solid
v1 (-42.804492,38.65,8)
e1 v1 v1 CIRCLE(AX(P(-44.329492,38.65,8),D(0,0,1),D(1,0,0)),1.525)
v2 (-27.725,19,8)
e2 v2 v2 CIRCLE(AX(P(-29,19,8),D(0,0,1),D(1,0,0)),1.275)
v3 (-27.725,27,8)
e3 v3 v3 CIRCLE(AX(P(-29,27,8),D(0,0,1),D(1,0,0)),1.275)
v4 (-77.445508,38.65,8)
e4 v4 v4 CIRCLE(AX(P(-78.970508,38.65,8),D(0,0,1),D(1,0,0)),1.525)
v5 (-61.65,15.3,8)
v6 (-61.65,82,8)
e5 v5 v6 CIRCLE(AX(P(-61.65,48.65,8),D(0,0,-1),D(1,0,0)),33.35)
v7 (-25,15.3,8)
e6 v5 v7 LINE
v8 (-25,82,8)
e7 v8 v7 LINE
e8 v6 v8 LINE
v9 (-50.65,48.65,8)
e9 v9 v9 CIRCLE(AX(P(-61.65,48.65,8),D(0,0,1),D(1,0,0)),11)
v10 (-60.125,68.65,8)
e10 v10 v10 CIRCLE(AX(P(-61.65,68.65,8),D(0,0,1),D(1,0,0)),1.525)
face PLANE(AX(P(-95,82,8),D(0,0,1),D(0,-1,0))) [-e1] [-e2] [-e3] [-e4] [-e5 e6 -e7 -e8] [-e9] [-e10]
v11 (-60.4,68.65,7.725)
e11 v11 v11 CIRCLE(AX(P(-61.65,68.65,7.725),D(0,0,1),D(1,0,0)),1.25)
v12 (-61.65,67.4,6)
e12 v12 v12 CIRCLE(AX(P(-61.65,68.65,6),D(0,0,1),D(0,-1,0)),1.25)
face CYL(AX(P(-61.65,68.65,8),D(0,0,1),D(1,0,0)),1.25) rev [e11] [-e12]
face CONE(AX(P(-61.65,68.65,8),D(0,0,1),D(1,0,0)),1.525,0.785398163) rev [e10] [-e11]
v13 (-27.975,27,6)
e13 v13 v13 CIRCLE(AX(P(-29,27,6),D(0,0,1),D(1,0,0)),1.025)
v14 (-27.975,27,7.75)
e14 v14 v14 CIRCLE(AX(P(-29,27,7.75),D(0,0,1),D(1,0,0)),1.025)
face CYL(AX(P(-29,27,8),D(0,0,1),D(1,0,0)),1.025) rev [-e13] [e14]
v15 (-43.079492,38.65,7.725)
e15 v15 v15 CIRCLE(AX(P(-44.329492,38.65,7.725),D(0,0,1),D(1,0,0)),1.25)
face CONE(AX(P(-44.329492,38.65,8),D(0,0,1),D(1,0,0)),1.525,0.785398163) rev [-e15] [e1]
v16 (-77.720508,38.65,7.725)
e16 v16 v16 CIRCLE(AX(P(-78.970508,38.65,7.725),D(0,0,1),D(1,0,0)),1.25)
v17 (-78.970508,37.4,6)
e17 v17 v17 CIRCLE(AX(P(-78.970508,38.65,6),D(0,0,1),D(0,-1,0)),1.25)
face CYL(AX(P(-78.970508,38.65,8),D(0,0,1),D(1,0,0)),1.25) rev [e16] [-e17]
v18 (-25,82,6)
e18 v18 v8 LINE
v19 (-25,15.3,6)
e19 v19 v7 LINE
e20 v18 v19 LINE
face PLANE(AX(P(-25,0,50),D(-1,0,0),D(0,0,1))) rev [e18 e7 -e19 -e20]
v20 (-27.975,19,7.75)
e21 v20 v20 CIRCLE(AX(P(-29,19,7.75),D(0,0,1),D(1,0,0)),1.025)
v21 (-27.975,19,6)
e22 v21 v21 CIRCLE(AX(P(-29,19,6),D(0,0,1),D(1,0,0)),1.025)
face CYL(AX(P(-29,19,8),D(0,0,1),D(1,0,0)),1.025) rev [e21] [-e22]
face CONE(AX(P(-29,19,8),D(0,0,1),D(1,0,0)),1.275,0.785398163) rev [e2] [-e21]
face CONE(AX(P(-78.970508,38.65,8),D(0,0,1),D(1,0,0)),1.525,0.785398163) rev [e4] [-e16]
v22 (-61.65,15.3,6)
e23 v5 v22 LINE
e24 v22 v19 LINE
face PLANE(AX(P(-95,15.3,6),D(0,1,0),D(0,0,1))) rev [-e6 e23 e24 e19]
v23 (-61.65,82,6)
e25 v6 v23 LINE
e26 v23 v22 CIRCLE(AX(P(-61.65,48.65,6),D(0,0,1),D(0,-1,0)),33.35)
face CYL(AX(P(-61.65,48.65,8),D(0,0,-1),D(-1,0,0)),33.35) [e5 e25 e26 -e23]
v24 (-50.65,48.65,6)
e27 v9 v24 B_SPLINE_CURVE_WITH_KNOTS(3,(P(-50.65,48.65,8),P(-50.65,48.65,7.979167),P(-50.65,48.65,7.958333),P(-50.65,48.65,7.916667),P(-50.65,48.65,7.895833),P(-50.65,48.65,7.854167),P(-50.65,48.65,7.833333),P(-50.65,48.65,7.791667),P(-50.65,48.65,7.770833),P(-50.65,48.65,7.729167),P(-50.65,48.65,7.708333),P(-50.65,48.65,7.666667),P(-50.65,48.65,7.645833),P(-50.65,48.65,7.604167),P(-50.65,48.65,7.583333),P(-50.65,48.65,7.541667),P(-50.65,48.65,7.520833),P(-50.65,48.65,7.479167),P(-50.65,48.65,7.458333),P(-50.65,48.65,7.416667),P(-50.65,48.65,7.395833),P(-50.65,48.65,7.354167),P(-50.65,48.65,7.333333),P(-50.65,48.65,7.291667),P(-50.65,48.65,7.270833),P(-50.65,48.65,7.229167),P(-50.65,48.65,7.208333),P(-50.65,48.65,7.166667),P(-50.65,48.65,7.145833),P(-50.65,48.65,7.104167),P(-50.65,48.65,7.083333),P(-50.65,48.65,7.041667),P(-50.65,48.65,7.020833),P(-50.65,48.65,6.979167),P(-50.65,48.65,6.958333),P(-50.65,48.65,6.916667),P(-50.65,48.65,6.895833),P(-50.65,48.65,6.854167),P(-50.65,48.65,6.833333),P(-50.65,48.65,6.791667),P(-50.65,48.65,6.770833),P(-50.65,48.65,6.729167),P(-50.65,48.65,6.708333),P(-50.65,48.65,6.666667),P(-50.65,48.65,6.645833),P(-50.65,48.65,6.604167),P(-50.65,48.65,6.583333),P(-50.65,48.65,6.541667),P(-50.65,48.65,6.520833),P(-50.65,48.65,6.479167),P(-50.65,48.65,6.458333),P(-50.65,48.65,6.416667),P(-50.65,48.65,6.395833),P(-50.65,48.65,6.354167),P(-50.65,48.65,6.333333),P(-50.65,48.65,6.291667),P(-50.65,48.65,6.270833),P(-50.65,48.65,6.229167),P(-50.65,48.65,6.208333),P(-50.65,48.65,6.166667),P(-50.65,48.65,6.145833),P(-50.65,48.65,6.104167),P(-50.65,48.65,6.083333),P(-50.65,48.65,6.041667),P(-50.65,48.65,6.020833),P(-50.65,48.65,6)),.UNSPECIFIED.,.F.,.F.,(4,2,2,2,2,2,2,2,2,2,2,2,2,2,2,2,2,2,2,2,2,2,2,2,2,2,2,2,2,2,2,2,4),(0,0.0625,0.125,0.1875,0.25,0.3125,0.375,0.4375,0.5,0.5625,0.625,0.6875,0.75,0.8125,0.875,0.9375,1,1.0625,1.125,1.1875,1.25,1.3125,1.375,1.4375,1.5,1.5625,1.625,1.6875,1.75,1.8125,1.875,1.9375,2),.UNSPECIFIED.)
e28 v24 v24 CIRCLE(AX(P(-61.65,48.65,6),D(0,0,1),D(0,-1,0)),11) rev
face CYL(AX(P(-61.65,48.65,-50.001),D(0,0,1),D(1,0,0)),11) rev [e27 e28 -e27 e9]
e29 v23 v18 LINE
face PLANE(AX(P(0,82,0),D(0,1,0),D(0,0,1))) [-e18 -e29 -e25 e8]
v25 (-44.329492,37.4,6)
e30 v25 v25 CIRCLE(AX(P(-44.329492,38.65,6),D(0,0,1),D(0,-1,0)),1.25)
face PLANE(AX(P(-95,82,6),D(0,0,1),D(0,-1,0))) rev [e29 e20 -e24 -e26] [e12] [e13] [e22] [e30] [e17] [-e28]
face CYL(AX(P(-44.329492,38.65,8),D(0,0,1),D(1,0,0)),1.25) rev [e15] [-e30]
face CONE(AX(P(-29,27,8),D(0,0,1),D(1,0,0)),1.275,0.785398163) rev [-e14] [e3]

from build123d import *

# Parameters (mm, degrees)
SKETCH_1_W                   = 50
SKETCH_1_H                   = 100
EXTRUDE_1_DEPTH              = 2
SKETCH_2_W                   = 3
SKETCH_2_H                   = 100
EXTRUDE_2_DEPTH              = 80
SKETCH_3_W                   = 2
SKETCH_3_H                   = 66.7
EXTRUDE_3_DEPTH              = 70
CUT_EXTRUDE_4_REACH          = 162.465
SKETCH_8_W                   = 2
SKETCH_8_H                   = 66.7
EXTRUDE_4_DEPTH              = 70
CUT_EXTRUDE_5_REACH          = 140.25
HOLE_WIZARD_M3_1_D           = 2.5
HOLE_WIZARD_M3_1_DEPTH       = 2
HOLE_WIZARD_M3_1_CSINK_D     = 3.05
HOLE_WIZARD_M3_1_CSINK_ANGLE = 90
FILLET_1_R                   = 2
CUT_EXTRUDE_6_REACH          = 140.25
SKETCH_12_R                  = 11
CUT_EXTRUDE_7_REACH          = 162.465
SKETCH_13_R                  = 14.5
SKETCH_14_W                  = 2
SKETCH_14_H                  = 66.7
EXTRUDE_5_DEPTH              = 70
CUT_EXTRUDE_8_REACH          = 156.14
SKETCH_15_R                  = 5.1
CUT_EXTRUDE_9_DEPTH          = 155.140358116
CUT_EXTRUDE_9_DEPTH_BACK     = 155.140358116
SKETCH_19_W                  = 2
SKETCH_19_H                  = 66.7
CUT_EXTRUDE_10_DEPTH         = 119.844436134
FILLET_2_R                   = 2
HOLE_WIZARD_M3_3_D           = 2.5
HOLE_WIZARD_M3_3_CSINK_D     = 3.05
HOLE_WIZARD_M3_3_CSINK_ANGLE = 90
CUT_EXTRUDE_11_DEPTH         = 134.88427839
CUT_EXTRUDE_11_DEPTH_BACK    = 134.88427839


# Read off the part's stored shape, not the designer's step: M1.6 螺纹孔1, M1.6 螺纹孔2, M2.5 螺纹孔1
with BuildPart() as part:
    # 草图1 → 凸台-拉伸1 (new body)
    with BuildSketch(Plane(origin=(0, 0, 0), x_dir=(1, 0, 0), z_dir=(0, 1, 0))):
        Rectangle(SKETCH_1_W, SKETCH_1_H)
    extrude(amount=EXTRUDE_1_DEPTH)

    # 草图2 → 凸台-拉伸2 (add)
    with BuildSketch(Plane(origin=(0, 2, 0), x_dir=(1, 0, 0), z_dir=(0, 1, 0))):
        with Locations((-23.5, 0)):
            Rectangle(SKETCH_2_W, SKETCH_2_H)
    extrude(amount=EXTRUDE_2_DEPTH)

    # 草图3 → 凸台-拉伸3 (add)
    with BuildSketch(Plane.ZY.offset(25)):
        with Locations((-49, 48.65)):
            Rectangle(SKETCH_3_W, SKETCH_3_H)
    extrude(amount=EXTRUDE_3_DEPTH)

    # 草图4 → 切除-拉伸4 (cut, up to next)
    with BuildSketch(Plane(origin=(0, 0, -50), x_dir=(-1, 0, 0), z_dir=(0, 0, -1)), mode=Mode.PRIVATE) as cut_extrude_4_sk1:
        with BuildLine():
            Line((95, 82), (61.65, 82))
            ThreePointArc((61.65, 82), (85.232011153, 72.232011153), (95, 48.65))
            Line((95, 48.65), (95, 82))
        make_face()
    cut_extrude_4_tool1 = extrude(cut_extrude_4_sk1.sketch, amount=-CUT_EXTRUDE_4_REACH, mode=Mode.PRIVATE) & part.part
    # 草图4 → 切除-拉伸4 (cut, up to next)
    with BuildSketch(Plane(origin=(0, 0, -50), x_dir=(-1, 0, 0), z_dir=(0, 0, -1)), mode=Mode.PRIVATE) as cut_extrude_4_sk2:
        with BuildLine():
            ThreePointArc((95, 48.65), (85.232011153, 25.067988847), (61.65, 15.3))
            Line((61.65, 15.3), (95, 15.3))
            Line((95, 15.3), (95, 48.65))
        make_face()
    cut_extrude_4_tool2 = extrude(cut_extrude_4_sk2.sketch, amount=-CUT_EXTRUDE_4_REACH, mode=Mode.PRIVATE) & part.part
    add(cut_extrude_4_tool1.solids().sort_by_distance((-87.550679, 74.550679, -50))[0], mode=Mode.SUBTRACT)
    add(cut_extrude_4_tool2.solids().sort_by_distance((-87.550679, 22.749321, -50))[0], mode=Mode.SUBTRACT)

    # 草图8 → 凸台-拉伸4 (add)
    with BuildSketch(Plane.ZY.offset(25)):
        with Locations((7, 48.65)):
            Rectangle(SKETCH_8_W, SKETCH_8_H)
    extrude(amount=EXTRUDE_4_DEPTH)

    # 草图9 → 切除-拉伸5 (cut, up to next)
    with BuildSketch(Plane.XY.offset(8), mode=Mode.PRIVATE) as cut_extrude_5_sk1:
        with BuildLine():
            ThreePointArc((-95, 48.65), (-85.232011153, 72.232011153), (-61.65, 82))
            Line((-61.65, 82), (-95, 82))
            Line((-95, 82), (-95, 48.65))
        make_face()
    cut_extrude_5_tool1 = extrude(cut_extrude_5_sk1.sketch, amount=-CUT_EXTRUDE_5_REACH, mode=Mode.PRIVATE) & part.part
    # 草图9 → 切除-拉伸5 (cut, up to next)
    with BuildSketch(Plane.XY.offset(8), mode=Mode.PRIVATE) as cut_extrude_5_sk2:
        with BuildLine():
            ThreePointArc((-61.65, 15.3), (-85.232011153, 25.067988847), (-95, 48.65))
            Line((-95, 48.65), (-95, 15.3))
            Line((-95, 15.3), (-61.65, 15.3))
        make_face()
    cut_extrude_5_tool2 = extrude(cut_extrude_5_sk2.sketch, amount=-CUT_EXTRUDE_5_REACH, mode=Mode.PRIVATE) & part.part
    add(cut_extrude_5_tool1.solids().sort_by_distance((-87.550679, 74.550679, 8))[0], mode=Mode.SUBTRACT)
    add(cut_extrude_5_tool2.solids().sort_by_distance((-87.550679, 22.749321, 8))[0], mode=Mode.SUBTRACT)

    # M3 螺纹孔1
    with Locations(Plane.XY.offset(8)):
        with Locations((-78.970508076, 38.65), (-61.65, 68.65), (-44.329491924, 38.65)):
            CounterSinkHole(HOLE_WIZARD_M3_1_D / 2, HOLE_WIZARD_M3_1_CSINK_D / 2, depth=HOLE_WIZARD_M3_1_DEPTH, counter_sink_angle=HOLE_WIZARD_M3_1_CSINK_ANGLE)

    # 圆角1
    fillet_1_edges = [part.edges().sort_by_distance(p)[0] for p in [
        (-23.5, 82, 50),
        (25, 1, 50),
        (25, 1, -50),
    ]]
    fillet(fillet_1_edges, radius=FILLET_1_R)

    # 草图12 → 切除-拉伸6 (cut, up to next)
    with BuildSketch(Plane.XY.offset(8), mode=Mode.PRIVATE) as cut_extrude_6_sk1:
        with Locations((-61.65, 48.65)):
            Circle(SKETCH_12_R)
    cut_extrude_6_tool1 = extrude(cut_extrude_6_sk1.sketch, amount=-CUT_EXTRUDE_6_REACH, mode=Mode.PRIVATE) & part.part
    add(cut_extrude_6_tool1.solids().sort_by_distance((-61.65, 48.65, 8))[0], mode=Mode.SUBTRACT)

    # 草图13 → 切除-拉伸7 (cut, up to next)
    with BuildSketch(Plane(origin=(0, 0, -50), x_dir=(-1, 0, 0), z_dir=(0, 0, -1)), mode=Mode.PRIVATE) as cut_extrude_7_sk1:
        with Locations((61.65, 48.65)):
            Circle(SKETCH_13_R)
    cut_extrude_7_tool1 = extrude(cut_extrude_7_sk1.sketch, amount=-CUT_EXTRUDE_7_REACH, mode=Mode.PRIVATE) & part.part
    add(cut_extrude_7_tool1.solids().sort_by_distance((-61.65, 48.65, -50))[0], mode=Mode.SUBTRACT)

    # 草图14 → 凸台-拉伸5 (add)
    with BuildSketch(Plane.ZY.offset(25)):
        with Locations((-38.5, 48.65)):
            Rectangle(SKETCH_14_W, SKETCH_14_H)
    extrude(amount=EXTRUDE_5_DEPTH)

    # 草图15 → 切除-拉伸8 (cut, up to next)
    with BuildSketch(Plane(origin=(0, 0, -39.5), x_dir=(-1, 0, 0), z_dir=(0, 0, -1)), mode=Mode.PRIVATE) as cut_extrude_8_sk1:
        with Locations(Location((61.65, 48.65, 0), (0, 0, 90))):
            Circle(SKETCH_15_R)
    cut_extrude_8_tool1 = extrude(cut_extrude_8_sk1.sketch, amount=-CUT_EXTRUDE_8_REACH, mode=Mode.PRIVATE) & part.part
    add(cut_extrude_8_tool1.solids().sort_by_distance((-61.65, 48.65, -39.5))[0], mode=Mode.SUBTRACT)

    # 草图18 → 切除-拉伸9 (cut, two sides: drawn at the far end of the back side and taken through both)
    with BuildSketch(Plane(origin=(0, 0, -39.5), x_dir=(-1, 0, 0), z_dir=(0, 0, -1)).offset(-CUT_EXTRUDE_9_DEPTH_BACK)):
        with BuildLine():
            Line((95, 15.3), (95, 48.65))
            ThreePointArc((95, 48.65), (85.232011153, 25.067988847), (61.65, 15.3))
            Line((61.65, 15.3), (95, 15.3))
        make_face()
        with BuildLine():
            Line((95, 48.65), (95, 82))
            Line((95, 82), (61.65, 82))
            ThreePointArc((61.65, 82), (85.232011153, 72.232011153), (95, 48.65))
        make_face()
    extrude(amount=CUT_EXTRUDE_9_DEPTH + CUT_EXTRUDE_9_DEPTH_BACK, mode=Mode.SUBTRACT)

    # 草图19 → 切除-拉伸10 (cut, through all)
    with BuildSketch(Plane.ZY.offset(25)):
        with Locations((-49, 48.65)):
            Rectangle(SKETCH_19_W, SKETCH_19_H)
    extrude(amount=CUT_EXTRUDE_10_DEPTH, mode=Mode.SUBTRACT)

    # 圆角2
    fillet_2_edges = [part.edges().sort_by_distance(p)[0] for p in [
        (-23.5, 82, -50),
    ]]
    fillet(fillet_2_edges, radius=FILLET_2_R)

    # M3 螺纹孔3 (through all)
    with Locations(Plane(origin=(0, 2, 0), x_dir=(1, 0, 0), z_dir=(0, 1, 0))):
        with Locations((-2.7, 0), (21, 10), (21, -10)):
            CounterSinkHole(HOLE_WIZARD_M3_3_D / 2, HOLE_WIZARD_M3_3_CSINK_D / 2, counter_sink_angle=HOLE_WIZARD_M3_3_CSINK_ANGLE)

    # M1.6 螺纹孔1 outline → M1.6 螺纹孔1 (revolve, cut)
    with BuildSketch(Plane(origin=(10, 0, -28), x_dir=(1, 0, 0), z_dir=(0, 0, 1))):
        Polygon((0, 0), (0.625, 0), (0.625, 1.8), (0.825, 2), (0, 2), align=None)
    revolve(axis=Axis((10, 0, -28), (0, 1, 0)), mode=Mode.SUBTRACT)

    # Hole Wizard M1.6 _1 2 outline → Hole Wizard M1.6 _1 2 (revolve, cut)
    with BuildSketch(Plane(origin=(6.4, 0, -28), x_dir=(1, 0, 0), z_dir=(0, 0, 1))):
        Polygon((0, 0), (0.625, 0), (0.625, 1.8), (0.825, 2), (0, 2), align=None)
    revolve(axis=Axis((6.4, 0, -28), (0, 1, 0)), mode=Mode.SUBTRACT)

    # M1.6 螺纹孔2 outline → M1.6 螺纹孔2 (revolve, cut)
    with BuildSketch(Plane(origin=(10, 0, -22), x_dir=(1, 0, 0), z_dir=(0, 0, 1))):
        Polygon((0, 0), (0.625, 0), (0.625, 1.8), (0.825, 2), (0, 2), align=None)
    revolve(axis=Axis((10, 0, -22), (0, 1, 0)), mode=Mode.SUBTRACT)

    # Hole Wizard M1.6 _2 2 outline → Hole Wizard M1.6 _2 2 (revolve, cut)
    with BuildSketch(Plane(origin=(6.4, 0, -22), x_dir=(1, 0, 0), z_dir=(0, 0, 1))):
        Polygon((0, 0), (0.625, 0), (0.625, 1.8), (0.825, 2), (0, 2), align=None)
    revolve(axis=Axis((6.4, 0, -22), (0, 1, 0)), mode=Mode.SUBTRACT)

    # 草图28 → 切除-拉伸11 (cut, two sides: drawn at the far end of the back side and taken through both)
    with BuildSketch(Plane(origin=(0, 2, 0), x_dir=(1, 0, 0), z_dir=(0, 1, 0)).offset(-CUT_EXTRUDE_11_DEPTH_BACK)):
        Polygon((-25, 37.5), (-95, 37.5), (-95, 39.5), (-25, 39.5), (-25, 50), (25, 50), (25, -50), (-25, -50), align=None)
    extrude(amount=CUT_EXTRUDE_11_DEPTH + CUT_EXTRUDE_11_DEPTH_BACK, mode=Mode.SUBTRACT)

    # M2.5 螺纹孔1 outline → M2.5 螺纹孔1 (revolve, cut)
    with BuildSketch(Plane(origin=(-29, 19, 0), x_dir=(1, 0, 0), z_dir=(0, -1, 0))):
        Polygon((0, 6), (1.025, 6), (1.025, 7.75), (1.275, 8), (0, 8), align=None)
    revolve(axis=Axis((-29, 19, 0), (0, 0, 1)), mode=Mode.SUBTRACT)

    # Hole Wizard M2.5 _1 2 outline → Hole Wizard M2.5 _1 2 (revolve, cut)
    with BuildSketch(Plane(origin=(-29, 27, 0), x_dir=(1, 0, 0), z_dir=(0, -1, 0))):
        Polygon((0, 6), (1.025, 6), (1.025, 7.75), (1.275, 8), (0, 8), align=None)
    revolve(axis=Axis((-29, 27, 0), (0, 0, 1)), mode=Mode.SUBTRACT)


solid = part.part
